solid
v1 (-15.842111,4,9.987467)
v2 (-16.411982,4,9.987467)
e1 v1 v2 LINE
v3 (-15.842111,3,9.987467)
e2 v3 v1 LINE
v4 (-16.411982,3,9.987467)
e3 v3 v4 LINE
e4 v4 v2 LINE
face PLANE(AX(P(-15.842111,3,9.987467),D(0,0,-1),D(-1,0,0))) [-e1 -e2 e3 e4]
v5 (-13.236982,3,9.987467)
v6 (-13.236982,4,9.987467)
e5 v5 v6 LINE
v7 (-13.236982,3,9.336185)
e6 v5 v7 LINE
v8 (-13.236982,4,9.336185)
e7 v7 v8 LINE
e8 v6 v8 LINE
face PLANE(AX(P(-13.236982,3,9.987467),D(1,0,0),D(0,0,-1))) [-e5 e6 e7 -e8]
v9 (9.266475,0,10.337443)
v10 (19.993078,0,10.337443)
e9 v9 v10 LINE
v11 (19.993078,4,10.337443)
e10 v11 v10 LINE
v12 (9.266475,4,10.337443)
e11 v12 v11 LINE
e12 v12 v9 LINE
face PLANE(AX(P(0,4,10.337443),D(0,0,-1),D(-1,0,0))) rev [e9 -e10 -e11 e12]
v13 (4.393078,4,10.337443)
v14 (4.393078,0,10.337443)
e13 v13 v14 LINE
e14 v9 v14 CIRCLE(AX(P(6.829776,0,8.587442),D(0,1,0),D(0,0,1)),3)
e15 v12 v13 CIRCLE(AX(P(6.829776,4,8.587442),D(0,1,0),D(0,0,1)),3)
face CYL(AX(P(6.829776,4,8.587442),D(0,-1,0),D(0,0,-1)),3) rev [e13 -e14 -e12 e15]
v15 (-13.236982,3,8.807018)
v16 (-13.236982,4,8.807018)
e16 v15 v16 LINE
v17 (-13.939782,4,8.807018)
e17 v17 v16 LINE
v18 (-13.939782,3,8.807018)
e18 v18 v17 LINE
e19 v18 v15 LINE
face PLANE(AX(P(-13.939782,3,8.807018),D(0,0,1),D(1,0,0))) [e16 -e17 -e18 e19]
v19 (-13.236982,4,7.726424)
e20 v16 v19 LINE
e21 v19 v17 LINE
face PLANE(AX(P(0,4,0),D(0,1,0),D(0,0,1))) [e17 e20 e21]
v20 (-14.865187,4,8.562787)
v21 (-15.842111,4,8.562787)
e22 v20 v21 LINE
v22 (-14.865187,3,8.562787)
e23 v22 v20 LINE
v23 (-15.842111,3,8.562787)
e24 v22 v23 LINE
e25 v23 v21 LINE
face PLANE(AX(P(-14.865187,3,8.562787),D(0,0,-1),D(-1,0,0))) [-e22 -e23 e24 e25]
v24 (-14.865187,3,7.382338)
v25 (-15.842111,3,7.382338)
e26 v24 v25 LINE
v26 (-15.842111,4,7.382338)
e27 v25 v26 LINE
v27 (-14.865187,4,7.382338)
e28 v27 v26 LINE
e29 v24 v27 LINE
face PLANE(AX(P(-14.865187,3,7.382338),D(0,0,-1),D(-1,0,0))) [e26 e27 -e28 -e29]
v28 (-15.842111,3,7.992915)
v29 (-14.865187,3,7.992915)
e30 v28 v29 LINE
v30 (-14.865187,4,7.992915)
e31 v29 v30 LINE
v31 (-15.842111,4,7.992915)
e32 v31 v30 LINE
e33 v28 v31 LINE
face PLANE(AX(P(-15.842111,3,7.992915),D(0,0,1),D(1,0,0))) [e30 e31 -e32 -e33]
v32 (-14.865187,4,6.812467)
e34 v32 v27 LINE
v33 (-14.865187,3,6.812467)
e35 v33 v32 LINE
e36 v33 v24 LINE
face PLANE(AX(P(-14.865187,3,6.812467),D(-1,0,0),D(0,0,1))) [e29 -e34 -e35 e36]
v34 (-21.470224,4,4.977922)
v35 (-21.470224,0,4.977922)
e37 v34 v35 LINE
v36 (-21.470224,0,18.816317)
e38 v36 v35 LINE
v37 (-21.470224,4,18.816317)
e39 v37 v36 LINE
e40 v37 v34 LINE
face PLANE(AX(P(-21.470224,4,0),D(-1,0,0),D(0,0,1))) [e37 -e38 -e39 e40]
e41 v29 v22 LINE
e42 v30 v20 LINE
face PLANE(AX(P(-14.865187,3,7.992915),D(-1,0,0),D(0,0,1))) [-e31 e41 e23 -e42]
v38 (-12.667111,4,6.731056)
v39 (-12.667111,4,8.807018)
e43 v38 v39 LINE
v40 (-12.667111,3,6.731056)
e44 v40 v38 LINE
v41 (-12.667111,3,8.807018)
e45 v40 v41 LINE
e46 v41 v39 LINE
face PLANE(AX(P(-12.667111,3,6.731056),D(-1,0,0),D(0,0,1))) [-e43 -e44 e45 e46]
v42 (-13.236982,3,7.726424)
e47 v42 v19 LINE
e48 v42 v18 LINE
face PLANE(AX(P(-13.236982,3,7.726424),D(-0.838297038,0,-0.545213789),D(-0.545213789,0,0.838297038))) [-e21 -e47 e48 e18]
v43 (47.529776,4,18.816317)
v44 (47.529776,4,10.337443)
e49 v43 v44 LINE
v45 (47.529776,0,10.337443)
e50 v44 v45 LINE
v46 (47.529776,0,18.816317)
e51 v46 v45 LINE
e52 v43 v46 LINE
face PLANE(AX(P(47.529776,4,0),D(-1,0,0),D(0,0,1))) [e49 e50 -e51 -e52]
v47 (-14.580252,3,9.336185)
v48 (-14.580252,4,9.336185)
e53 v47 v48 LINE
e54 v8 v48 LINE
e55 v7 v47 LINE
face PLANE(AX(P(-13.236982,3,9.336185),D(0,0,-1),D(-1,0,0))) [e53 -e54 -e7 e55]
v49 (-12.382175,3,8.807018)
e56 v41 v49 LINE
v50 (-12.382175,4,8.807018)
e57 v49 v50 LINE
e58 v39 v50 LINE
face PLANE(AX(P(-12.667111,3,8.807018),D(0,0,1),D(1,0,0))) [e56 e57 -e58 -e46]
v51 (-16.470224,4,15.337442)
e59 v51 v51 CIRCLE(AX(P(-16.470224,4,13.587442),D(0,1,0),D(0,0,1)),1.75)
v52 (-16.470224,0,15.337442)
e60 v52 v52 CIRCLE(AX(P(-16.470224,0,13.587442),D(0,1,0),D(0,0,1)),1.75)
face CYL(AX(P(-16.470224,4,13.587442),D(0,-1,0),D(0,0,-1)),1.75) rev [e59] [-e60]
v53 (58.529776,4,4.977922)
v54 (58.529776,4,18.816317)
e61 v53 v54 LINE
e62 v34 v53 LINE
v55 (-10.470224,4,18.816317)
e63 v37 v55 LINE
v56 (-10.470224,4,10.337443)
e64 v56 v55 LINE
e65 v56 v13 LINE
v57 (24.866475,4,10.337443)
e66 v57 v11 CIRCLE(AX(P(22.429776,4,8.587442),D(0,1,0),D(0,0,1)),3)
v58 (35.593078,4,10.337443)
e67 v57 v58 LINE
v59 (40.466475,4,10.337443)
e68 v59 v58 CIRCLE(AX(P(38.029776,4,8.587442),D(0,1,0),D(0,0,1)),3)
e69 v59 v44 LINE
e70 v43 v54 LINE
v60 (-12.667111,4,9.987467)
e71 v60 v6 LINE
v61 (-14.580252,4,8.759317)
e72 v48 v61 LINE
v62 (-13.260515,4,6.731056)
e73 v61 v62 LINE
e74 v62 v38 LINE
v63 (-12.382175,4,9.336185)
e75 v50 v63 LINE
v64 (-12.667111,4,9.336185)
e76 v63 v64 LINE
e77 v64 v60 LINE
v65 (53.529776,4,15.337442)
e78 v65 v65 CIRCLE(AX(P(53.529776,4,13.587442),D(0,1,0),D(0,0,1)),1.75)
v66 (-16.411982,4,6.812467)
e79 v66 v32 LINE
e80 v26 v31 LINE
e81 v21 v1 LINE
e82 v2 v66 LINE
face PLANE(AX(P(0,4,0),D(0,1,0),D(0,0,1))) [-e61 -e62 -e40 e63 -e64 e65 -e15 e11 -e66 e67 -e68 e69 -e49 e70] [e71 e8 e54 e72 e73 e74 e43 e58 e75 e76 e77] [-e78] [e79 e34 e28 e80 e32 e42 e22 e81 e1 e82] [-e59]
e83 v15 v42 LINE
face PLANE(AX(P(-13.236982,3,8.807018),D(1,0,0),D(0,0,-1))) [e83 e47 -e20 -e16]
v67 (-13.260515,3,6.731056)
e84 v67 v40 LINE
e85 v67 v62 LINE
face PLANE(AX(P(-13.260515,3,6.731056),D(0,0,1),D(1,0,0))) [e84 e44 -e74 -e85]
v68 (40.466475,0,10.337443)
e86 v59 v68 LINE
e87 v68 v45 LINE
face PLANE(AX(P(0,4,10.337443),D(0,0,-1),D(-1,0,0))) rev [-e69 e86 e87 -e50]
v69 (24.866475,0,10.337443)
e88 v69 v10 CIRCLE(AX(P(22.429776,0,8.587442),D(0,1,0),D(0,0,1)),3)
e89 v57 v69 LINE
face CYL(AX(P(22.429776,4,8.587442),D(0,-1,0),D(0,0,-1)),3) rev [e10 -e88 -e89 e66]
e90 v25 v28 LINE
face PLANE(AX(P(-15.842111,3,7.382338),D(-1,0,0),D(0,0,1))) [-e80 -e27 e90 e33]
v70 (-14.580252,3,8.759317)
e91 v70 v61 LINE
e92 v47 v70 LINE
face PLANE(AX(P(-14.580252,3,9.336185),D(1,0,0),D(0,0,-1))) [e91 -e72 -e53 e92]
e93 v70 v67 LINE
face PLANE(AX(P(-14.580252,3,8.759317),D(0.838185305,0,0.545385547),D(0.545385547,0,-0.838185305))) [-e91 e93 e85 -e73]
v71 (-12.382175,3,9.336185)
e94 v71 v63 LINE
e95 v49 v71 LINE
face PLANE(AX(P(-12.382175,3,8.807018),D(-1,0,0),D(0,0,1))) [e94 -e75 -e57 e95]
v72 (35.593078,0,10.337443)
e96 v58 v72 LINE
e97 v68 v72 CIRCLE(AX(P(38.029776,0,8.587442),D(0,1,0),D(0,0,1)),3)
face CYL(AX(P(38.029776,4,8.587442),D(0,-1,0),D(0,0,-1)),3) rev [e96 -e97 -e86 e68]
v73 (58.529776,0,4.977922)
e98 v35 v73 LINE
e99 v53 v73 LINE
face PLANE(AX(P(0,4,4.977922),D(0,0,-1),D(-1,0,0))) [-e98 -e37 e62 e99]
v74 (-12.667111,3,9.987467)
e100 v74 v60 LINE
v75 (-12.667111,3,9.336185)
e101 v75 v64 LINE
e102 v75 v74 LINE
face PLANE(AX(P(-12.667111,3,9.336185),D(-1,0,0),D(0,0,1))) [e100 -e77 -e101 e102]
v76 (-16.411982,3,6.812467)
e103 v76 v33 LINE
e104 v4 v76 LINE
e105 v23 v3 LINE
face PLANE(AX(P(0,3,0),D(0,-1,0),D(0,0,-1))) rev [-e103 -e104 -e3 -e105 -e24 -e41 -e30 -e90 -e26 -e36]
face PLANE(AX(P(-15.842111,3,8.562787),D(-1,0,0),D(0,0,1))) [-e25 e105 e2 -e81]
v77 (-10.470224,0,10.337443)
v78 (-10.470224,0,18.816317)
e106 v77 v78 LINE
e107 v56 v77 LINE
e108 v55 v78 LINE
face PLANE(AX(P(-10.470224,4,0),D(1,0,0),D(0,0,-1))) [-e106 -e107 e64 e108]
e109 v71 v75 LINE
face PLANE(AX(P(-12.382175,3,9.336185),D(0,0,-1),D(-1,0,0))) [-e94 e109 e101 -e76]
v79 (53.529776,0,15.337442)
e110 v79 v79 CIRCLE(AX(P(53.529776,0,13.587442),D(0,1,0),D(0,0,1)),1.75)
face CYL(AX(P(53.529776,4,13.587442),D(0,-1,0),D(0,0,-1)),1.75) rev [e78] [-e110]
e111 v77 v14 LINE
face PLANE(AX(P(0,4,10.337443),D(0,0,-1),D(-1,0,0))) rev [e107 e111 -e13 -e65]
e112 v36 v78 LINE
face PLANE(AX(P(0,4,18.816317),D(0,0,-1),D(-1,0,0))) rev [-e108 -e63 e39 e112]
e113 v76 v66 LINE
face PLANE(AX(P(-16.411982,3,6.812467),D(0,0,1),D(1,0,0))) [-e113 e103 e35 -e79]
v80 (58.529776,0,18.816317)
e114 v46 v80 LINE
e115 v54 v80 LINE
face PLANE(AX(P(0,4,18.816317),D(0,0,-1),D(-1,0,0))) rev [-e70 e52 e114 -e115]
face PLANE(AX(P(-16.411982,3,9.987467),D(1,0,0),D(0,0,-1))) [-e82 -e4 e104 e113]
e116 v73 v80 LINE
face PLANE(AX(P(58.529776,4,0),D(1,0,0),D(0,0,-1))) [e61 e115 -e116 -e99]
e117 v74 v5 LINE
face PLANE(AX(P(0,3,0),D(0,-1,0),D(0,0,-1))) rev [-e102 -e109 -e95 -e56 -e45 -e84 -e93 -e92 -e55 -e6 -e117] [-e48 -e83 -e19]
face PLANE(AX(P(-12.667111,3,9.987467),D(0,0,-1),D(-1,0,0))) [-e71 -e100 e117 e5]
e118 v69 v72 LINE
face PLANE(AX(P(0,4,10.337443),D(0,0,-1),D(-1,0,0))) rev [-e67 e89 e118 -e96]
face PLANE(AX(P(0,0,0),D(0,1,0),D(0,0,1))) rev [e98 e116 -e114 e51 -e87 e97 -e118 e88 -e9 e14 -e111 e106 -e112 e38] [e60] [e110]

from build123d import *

# Parameters (mm, degrees)
BOSS_EXTRUDE1_OUTLINE_R = 1.75
BOSS_EXTRUDE1_DEPTH     = 4
CUT_EXTRUDE1_DEPTH      = 1


# Read off the part's stored shape, not the designer's step: Boss-Extrude1
with BuildPart() as part:
    # Boss-Extrude1 outline → Boss-Extrude1 (new body)
    with BuildSketch(Plane(origin=(0, 0, 0), x_dir=(1, 0, 0), z_dir=(0, 1, 0))):
        with BuildLine():
            Line((24.866474615, -10.33744254), (35.59307775, -10.33744254))
            ThreePointArc((35.59307775, -10.33744254), (38.029776183, -5.587442326), (40.466474615, -10.33744254))
            Line((40.466474615, -10.33744254), (47.529776182, -10.33744254))
            Line((47.529776182, -10.33744254), (47.529776182, -18.81631662))
            Line((47.529776182, -18.81631662), (58.529776182, -18.81631662))
            Line((58.529776182, -18.81631662), (58.529776182, -4.977921711))
            Line((58.529776182, -4.977921711), (-21.470223818, -4.977921711))
            Line((-21.470223818, -4.977921711), (-21.470223818, -18.81631662))
            Line((-21.470223818, -18.81631662), (-10.470223818, -18.81631662))
            Line((-10.470223818, -18.81631662), (-10.470223818, -10.33744254))
            Line((-10.470223818, -10.33744254), (4.39307775, -10.33744254))
            ThreePointArc((4.39307775, -10.33744254), (6.829776182, -5.587442326), (9.266474615, -10.33744254))
            Line((9.266474615, -10.33744254), (19.99307775, -10.33744254))
            ThreePointArc((19.99307775, -10.33744254), (22.429776182, -5.587442326), (24.866474615, -10.33744254))
        make_face()
        with Locations((-16.470223818, -13.587442433)):
            Circle(BOSS_EXTRUDE1_OUTLINE_R, mode=Mode.SUBTRACT)
        with Locations((53.529776182, -13.587442433)):
            Circle(BOSS_EXTRUDE1_OUTLINE_R, mode=Mode.SUBTRACT)
    extrude(amount=BOSS_EXTRUDE1_DEPTH)

    # Sketch2 → Cut-Extrude1 (cut)
    # profile 1 of 2: a face of its own
    with BuildSketch(Plane(origin=(0, 4, 0), x_dir=(1, 0, 0), z_dir=(0, 1, 0))):
        Polygon((-16.41198232, -6.812466594), (-14.865187448, -6.812466594), (-14.865187448, -7.382338389), (-15.842110525, -7.382338389), (-15.842110525, -7.992915312), (-14.865187448, -7.992915312), (-14.865187448, -8.562787107), (-15.842110525, -8.562787107), (-15.842110525, -9.987466594), (-16.41198232, -9.987466594), align=None)
    # profile 2 of 2: a face of its own
    with BuildSketch(Plane(origin=(0, 4, 0), x_dir=(1, 0, 0), z_dir=(0, 1, 0))):
        Polygon((-13.260514973, -6.731056337), (-12.667110525, -6.731056337), (-12.667110525, -8.807017876), (-12.382174628, -8.807017876), (-12.382174628, -9.336184543), (-12.667110525, -9.336184543), (-12.667110525, -9.987466594), (-13.23698232, -9.987466594), (-13.23698232, -9.336184543), (-14.580251551, -9.336184543), (-14.580251551, -8.759316554), align=None)
        Polygon((-13.23698232, -8.807017876), (-13.23698232, -7.726423926), (-13.939781799, -8.807017876), align=None, mode=Mode.SUBTRACT)
    extrude(amount=-CUT_EXTRUDE1_DEPTH, mode=Mode.SUBTRACT)


solid = part.part
